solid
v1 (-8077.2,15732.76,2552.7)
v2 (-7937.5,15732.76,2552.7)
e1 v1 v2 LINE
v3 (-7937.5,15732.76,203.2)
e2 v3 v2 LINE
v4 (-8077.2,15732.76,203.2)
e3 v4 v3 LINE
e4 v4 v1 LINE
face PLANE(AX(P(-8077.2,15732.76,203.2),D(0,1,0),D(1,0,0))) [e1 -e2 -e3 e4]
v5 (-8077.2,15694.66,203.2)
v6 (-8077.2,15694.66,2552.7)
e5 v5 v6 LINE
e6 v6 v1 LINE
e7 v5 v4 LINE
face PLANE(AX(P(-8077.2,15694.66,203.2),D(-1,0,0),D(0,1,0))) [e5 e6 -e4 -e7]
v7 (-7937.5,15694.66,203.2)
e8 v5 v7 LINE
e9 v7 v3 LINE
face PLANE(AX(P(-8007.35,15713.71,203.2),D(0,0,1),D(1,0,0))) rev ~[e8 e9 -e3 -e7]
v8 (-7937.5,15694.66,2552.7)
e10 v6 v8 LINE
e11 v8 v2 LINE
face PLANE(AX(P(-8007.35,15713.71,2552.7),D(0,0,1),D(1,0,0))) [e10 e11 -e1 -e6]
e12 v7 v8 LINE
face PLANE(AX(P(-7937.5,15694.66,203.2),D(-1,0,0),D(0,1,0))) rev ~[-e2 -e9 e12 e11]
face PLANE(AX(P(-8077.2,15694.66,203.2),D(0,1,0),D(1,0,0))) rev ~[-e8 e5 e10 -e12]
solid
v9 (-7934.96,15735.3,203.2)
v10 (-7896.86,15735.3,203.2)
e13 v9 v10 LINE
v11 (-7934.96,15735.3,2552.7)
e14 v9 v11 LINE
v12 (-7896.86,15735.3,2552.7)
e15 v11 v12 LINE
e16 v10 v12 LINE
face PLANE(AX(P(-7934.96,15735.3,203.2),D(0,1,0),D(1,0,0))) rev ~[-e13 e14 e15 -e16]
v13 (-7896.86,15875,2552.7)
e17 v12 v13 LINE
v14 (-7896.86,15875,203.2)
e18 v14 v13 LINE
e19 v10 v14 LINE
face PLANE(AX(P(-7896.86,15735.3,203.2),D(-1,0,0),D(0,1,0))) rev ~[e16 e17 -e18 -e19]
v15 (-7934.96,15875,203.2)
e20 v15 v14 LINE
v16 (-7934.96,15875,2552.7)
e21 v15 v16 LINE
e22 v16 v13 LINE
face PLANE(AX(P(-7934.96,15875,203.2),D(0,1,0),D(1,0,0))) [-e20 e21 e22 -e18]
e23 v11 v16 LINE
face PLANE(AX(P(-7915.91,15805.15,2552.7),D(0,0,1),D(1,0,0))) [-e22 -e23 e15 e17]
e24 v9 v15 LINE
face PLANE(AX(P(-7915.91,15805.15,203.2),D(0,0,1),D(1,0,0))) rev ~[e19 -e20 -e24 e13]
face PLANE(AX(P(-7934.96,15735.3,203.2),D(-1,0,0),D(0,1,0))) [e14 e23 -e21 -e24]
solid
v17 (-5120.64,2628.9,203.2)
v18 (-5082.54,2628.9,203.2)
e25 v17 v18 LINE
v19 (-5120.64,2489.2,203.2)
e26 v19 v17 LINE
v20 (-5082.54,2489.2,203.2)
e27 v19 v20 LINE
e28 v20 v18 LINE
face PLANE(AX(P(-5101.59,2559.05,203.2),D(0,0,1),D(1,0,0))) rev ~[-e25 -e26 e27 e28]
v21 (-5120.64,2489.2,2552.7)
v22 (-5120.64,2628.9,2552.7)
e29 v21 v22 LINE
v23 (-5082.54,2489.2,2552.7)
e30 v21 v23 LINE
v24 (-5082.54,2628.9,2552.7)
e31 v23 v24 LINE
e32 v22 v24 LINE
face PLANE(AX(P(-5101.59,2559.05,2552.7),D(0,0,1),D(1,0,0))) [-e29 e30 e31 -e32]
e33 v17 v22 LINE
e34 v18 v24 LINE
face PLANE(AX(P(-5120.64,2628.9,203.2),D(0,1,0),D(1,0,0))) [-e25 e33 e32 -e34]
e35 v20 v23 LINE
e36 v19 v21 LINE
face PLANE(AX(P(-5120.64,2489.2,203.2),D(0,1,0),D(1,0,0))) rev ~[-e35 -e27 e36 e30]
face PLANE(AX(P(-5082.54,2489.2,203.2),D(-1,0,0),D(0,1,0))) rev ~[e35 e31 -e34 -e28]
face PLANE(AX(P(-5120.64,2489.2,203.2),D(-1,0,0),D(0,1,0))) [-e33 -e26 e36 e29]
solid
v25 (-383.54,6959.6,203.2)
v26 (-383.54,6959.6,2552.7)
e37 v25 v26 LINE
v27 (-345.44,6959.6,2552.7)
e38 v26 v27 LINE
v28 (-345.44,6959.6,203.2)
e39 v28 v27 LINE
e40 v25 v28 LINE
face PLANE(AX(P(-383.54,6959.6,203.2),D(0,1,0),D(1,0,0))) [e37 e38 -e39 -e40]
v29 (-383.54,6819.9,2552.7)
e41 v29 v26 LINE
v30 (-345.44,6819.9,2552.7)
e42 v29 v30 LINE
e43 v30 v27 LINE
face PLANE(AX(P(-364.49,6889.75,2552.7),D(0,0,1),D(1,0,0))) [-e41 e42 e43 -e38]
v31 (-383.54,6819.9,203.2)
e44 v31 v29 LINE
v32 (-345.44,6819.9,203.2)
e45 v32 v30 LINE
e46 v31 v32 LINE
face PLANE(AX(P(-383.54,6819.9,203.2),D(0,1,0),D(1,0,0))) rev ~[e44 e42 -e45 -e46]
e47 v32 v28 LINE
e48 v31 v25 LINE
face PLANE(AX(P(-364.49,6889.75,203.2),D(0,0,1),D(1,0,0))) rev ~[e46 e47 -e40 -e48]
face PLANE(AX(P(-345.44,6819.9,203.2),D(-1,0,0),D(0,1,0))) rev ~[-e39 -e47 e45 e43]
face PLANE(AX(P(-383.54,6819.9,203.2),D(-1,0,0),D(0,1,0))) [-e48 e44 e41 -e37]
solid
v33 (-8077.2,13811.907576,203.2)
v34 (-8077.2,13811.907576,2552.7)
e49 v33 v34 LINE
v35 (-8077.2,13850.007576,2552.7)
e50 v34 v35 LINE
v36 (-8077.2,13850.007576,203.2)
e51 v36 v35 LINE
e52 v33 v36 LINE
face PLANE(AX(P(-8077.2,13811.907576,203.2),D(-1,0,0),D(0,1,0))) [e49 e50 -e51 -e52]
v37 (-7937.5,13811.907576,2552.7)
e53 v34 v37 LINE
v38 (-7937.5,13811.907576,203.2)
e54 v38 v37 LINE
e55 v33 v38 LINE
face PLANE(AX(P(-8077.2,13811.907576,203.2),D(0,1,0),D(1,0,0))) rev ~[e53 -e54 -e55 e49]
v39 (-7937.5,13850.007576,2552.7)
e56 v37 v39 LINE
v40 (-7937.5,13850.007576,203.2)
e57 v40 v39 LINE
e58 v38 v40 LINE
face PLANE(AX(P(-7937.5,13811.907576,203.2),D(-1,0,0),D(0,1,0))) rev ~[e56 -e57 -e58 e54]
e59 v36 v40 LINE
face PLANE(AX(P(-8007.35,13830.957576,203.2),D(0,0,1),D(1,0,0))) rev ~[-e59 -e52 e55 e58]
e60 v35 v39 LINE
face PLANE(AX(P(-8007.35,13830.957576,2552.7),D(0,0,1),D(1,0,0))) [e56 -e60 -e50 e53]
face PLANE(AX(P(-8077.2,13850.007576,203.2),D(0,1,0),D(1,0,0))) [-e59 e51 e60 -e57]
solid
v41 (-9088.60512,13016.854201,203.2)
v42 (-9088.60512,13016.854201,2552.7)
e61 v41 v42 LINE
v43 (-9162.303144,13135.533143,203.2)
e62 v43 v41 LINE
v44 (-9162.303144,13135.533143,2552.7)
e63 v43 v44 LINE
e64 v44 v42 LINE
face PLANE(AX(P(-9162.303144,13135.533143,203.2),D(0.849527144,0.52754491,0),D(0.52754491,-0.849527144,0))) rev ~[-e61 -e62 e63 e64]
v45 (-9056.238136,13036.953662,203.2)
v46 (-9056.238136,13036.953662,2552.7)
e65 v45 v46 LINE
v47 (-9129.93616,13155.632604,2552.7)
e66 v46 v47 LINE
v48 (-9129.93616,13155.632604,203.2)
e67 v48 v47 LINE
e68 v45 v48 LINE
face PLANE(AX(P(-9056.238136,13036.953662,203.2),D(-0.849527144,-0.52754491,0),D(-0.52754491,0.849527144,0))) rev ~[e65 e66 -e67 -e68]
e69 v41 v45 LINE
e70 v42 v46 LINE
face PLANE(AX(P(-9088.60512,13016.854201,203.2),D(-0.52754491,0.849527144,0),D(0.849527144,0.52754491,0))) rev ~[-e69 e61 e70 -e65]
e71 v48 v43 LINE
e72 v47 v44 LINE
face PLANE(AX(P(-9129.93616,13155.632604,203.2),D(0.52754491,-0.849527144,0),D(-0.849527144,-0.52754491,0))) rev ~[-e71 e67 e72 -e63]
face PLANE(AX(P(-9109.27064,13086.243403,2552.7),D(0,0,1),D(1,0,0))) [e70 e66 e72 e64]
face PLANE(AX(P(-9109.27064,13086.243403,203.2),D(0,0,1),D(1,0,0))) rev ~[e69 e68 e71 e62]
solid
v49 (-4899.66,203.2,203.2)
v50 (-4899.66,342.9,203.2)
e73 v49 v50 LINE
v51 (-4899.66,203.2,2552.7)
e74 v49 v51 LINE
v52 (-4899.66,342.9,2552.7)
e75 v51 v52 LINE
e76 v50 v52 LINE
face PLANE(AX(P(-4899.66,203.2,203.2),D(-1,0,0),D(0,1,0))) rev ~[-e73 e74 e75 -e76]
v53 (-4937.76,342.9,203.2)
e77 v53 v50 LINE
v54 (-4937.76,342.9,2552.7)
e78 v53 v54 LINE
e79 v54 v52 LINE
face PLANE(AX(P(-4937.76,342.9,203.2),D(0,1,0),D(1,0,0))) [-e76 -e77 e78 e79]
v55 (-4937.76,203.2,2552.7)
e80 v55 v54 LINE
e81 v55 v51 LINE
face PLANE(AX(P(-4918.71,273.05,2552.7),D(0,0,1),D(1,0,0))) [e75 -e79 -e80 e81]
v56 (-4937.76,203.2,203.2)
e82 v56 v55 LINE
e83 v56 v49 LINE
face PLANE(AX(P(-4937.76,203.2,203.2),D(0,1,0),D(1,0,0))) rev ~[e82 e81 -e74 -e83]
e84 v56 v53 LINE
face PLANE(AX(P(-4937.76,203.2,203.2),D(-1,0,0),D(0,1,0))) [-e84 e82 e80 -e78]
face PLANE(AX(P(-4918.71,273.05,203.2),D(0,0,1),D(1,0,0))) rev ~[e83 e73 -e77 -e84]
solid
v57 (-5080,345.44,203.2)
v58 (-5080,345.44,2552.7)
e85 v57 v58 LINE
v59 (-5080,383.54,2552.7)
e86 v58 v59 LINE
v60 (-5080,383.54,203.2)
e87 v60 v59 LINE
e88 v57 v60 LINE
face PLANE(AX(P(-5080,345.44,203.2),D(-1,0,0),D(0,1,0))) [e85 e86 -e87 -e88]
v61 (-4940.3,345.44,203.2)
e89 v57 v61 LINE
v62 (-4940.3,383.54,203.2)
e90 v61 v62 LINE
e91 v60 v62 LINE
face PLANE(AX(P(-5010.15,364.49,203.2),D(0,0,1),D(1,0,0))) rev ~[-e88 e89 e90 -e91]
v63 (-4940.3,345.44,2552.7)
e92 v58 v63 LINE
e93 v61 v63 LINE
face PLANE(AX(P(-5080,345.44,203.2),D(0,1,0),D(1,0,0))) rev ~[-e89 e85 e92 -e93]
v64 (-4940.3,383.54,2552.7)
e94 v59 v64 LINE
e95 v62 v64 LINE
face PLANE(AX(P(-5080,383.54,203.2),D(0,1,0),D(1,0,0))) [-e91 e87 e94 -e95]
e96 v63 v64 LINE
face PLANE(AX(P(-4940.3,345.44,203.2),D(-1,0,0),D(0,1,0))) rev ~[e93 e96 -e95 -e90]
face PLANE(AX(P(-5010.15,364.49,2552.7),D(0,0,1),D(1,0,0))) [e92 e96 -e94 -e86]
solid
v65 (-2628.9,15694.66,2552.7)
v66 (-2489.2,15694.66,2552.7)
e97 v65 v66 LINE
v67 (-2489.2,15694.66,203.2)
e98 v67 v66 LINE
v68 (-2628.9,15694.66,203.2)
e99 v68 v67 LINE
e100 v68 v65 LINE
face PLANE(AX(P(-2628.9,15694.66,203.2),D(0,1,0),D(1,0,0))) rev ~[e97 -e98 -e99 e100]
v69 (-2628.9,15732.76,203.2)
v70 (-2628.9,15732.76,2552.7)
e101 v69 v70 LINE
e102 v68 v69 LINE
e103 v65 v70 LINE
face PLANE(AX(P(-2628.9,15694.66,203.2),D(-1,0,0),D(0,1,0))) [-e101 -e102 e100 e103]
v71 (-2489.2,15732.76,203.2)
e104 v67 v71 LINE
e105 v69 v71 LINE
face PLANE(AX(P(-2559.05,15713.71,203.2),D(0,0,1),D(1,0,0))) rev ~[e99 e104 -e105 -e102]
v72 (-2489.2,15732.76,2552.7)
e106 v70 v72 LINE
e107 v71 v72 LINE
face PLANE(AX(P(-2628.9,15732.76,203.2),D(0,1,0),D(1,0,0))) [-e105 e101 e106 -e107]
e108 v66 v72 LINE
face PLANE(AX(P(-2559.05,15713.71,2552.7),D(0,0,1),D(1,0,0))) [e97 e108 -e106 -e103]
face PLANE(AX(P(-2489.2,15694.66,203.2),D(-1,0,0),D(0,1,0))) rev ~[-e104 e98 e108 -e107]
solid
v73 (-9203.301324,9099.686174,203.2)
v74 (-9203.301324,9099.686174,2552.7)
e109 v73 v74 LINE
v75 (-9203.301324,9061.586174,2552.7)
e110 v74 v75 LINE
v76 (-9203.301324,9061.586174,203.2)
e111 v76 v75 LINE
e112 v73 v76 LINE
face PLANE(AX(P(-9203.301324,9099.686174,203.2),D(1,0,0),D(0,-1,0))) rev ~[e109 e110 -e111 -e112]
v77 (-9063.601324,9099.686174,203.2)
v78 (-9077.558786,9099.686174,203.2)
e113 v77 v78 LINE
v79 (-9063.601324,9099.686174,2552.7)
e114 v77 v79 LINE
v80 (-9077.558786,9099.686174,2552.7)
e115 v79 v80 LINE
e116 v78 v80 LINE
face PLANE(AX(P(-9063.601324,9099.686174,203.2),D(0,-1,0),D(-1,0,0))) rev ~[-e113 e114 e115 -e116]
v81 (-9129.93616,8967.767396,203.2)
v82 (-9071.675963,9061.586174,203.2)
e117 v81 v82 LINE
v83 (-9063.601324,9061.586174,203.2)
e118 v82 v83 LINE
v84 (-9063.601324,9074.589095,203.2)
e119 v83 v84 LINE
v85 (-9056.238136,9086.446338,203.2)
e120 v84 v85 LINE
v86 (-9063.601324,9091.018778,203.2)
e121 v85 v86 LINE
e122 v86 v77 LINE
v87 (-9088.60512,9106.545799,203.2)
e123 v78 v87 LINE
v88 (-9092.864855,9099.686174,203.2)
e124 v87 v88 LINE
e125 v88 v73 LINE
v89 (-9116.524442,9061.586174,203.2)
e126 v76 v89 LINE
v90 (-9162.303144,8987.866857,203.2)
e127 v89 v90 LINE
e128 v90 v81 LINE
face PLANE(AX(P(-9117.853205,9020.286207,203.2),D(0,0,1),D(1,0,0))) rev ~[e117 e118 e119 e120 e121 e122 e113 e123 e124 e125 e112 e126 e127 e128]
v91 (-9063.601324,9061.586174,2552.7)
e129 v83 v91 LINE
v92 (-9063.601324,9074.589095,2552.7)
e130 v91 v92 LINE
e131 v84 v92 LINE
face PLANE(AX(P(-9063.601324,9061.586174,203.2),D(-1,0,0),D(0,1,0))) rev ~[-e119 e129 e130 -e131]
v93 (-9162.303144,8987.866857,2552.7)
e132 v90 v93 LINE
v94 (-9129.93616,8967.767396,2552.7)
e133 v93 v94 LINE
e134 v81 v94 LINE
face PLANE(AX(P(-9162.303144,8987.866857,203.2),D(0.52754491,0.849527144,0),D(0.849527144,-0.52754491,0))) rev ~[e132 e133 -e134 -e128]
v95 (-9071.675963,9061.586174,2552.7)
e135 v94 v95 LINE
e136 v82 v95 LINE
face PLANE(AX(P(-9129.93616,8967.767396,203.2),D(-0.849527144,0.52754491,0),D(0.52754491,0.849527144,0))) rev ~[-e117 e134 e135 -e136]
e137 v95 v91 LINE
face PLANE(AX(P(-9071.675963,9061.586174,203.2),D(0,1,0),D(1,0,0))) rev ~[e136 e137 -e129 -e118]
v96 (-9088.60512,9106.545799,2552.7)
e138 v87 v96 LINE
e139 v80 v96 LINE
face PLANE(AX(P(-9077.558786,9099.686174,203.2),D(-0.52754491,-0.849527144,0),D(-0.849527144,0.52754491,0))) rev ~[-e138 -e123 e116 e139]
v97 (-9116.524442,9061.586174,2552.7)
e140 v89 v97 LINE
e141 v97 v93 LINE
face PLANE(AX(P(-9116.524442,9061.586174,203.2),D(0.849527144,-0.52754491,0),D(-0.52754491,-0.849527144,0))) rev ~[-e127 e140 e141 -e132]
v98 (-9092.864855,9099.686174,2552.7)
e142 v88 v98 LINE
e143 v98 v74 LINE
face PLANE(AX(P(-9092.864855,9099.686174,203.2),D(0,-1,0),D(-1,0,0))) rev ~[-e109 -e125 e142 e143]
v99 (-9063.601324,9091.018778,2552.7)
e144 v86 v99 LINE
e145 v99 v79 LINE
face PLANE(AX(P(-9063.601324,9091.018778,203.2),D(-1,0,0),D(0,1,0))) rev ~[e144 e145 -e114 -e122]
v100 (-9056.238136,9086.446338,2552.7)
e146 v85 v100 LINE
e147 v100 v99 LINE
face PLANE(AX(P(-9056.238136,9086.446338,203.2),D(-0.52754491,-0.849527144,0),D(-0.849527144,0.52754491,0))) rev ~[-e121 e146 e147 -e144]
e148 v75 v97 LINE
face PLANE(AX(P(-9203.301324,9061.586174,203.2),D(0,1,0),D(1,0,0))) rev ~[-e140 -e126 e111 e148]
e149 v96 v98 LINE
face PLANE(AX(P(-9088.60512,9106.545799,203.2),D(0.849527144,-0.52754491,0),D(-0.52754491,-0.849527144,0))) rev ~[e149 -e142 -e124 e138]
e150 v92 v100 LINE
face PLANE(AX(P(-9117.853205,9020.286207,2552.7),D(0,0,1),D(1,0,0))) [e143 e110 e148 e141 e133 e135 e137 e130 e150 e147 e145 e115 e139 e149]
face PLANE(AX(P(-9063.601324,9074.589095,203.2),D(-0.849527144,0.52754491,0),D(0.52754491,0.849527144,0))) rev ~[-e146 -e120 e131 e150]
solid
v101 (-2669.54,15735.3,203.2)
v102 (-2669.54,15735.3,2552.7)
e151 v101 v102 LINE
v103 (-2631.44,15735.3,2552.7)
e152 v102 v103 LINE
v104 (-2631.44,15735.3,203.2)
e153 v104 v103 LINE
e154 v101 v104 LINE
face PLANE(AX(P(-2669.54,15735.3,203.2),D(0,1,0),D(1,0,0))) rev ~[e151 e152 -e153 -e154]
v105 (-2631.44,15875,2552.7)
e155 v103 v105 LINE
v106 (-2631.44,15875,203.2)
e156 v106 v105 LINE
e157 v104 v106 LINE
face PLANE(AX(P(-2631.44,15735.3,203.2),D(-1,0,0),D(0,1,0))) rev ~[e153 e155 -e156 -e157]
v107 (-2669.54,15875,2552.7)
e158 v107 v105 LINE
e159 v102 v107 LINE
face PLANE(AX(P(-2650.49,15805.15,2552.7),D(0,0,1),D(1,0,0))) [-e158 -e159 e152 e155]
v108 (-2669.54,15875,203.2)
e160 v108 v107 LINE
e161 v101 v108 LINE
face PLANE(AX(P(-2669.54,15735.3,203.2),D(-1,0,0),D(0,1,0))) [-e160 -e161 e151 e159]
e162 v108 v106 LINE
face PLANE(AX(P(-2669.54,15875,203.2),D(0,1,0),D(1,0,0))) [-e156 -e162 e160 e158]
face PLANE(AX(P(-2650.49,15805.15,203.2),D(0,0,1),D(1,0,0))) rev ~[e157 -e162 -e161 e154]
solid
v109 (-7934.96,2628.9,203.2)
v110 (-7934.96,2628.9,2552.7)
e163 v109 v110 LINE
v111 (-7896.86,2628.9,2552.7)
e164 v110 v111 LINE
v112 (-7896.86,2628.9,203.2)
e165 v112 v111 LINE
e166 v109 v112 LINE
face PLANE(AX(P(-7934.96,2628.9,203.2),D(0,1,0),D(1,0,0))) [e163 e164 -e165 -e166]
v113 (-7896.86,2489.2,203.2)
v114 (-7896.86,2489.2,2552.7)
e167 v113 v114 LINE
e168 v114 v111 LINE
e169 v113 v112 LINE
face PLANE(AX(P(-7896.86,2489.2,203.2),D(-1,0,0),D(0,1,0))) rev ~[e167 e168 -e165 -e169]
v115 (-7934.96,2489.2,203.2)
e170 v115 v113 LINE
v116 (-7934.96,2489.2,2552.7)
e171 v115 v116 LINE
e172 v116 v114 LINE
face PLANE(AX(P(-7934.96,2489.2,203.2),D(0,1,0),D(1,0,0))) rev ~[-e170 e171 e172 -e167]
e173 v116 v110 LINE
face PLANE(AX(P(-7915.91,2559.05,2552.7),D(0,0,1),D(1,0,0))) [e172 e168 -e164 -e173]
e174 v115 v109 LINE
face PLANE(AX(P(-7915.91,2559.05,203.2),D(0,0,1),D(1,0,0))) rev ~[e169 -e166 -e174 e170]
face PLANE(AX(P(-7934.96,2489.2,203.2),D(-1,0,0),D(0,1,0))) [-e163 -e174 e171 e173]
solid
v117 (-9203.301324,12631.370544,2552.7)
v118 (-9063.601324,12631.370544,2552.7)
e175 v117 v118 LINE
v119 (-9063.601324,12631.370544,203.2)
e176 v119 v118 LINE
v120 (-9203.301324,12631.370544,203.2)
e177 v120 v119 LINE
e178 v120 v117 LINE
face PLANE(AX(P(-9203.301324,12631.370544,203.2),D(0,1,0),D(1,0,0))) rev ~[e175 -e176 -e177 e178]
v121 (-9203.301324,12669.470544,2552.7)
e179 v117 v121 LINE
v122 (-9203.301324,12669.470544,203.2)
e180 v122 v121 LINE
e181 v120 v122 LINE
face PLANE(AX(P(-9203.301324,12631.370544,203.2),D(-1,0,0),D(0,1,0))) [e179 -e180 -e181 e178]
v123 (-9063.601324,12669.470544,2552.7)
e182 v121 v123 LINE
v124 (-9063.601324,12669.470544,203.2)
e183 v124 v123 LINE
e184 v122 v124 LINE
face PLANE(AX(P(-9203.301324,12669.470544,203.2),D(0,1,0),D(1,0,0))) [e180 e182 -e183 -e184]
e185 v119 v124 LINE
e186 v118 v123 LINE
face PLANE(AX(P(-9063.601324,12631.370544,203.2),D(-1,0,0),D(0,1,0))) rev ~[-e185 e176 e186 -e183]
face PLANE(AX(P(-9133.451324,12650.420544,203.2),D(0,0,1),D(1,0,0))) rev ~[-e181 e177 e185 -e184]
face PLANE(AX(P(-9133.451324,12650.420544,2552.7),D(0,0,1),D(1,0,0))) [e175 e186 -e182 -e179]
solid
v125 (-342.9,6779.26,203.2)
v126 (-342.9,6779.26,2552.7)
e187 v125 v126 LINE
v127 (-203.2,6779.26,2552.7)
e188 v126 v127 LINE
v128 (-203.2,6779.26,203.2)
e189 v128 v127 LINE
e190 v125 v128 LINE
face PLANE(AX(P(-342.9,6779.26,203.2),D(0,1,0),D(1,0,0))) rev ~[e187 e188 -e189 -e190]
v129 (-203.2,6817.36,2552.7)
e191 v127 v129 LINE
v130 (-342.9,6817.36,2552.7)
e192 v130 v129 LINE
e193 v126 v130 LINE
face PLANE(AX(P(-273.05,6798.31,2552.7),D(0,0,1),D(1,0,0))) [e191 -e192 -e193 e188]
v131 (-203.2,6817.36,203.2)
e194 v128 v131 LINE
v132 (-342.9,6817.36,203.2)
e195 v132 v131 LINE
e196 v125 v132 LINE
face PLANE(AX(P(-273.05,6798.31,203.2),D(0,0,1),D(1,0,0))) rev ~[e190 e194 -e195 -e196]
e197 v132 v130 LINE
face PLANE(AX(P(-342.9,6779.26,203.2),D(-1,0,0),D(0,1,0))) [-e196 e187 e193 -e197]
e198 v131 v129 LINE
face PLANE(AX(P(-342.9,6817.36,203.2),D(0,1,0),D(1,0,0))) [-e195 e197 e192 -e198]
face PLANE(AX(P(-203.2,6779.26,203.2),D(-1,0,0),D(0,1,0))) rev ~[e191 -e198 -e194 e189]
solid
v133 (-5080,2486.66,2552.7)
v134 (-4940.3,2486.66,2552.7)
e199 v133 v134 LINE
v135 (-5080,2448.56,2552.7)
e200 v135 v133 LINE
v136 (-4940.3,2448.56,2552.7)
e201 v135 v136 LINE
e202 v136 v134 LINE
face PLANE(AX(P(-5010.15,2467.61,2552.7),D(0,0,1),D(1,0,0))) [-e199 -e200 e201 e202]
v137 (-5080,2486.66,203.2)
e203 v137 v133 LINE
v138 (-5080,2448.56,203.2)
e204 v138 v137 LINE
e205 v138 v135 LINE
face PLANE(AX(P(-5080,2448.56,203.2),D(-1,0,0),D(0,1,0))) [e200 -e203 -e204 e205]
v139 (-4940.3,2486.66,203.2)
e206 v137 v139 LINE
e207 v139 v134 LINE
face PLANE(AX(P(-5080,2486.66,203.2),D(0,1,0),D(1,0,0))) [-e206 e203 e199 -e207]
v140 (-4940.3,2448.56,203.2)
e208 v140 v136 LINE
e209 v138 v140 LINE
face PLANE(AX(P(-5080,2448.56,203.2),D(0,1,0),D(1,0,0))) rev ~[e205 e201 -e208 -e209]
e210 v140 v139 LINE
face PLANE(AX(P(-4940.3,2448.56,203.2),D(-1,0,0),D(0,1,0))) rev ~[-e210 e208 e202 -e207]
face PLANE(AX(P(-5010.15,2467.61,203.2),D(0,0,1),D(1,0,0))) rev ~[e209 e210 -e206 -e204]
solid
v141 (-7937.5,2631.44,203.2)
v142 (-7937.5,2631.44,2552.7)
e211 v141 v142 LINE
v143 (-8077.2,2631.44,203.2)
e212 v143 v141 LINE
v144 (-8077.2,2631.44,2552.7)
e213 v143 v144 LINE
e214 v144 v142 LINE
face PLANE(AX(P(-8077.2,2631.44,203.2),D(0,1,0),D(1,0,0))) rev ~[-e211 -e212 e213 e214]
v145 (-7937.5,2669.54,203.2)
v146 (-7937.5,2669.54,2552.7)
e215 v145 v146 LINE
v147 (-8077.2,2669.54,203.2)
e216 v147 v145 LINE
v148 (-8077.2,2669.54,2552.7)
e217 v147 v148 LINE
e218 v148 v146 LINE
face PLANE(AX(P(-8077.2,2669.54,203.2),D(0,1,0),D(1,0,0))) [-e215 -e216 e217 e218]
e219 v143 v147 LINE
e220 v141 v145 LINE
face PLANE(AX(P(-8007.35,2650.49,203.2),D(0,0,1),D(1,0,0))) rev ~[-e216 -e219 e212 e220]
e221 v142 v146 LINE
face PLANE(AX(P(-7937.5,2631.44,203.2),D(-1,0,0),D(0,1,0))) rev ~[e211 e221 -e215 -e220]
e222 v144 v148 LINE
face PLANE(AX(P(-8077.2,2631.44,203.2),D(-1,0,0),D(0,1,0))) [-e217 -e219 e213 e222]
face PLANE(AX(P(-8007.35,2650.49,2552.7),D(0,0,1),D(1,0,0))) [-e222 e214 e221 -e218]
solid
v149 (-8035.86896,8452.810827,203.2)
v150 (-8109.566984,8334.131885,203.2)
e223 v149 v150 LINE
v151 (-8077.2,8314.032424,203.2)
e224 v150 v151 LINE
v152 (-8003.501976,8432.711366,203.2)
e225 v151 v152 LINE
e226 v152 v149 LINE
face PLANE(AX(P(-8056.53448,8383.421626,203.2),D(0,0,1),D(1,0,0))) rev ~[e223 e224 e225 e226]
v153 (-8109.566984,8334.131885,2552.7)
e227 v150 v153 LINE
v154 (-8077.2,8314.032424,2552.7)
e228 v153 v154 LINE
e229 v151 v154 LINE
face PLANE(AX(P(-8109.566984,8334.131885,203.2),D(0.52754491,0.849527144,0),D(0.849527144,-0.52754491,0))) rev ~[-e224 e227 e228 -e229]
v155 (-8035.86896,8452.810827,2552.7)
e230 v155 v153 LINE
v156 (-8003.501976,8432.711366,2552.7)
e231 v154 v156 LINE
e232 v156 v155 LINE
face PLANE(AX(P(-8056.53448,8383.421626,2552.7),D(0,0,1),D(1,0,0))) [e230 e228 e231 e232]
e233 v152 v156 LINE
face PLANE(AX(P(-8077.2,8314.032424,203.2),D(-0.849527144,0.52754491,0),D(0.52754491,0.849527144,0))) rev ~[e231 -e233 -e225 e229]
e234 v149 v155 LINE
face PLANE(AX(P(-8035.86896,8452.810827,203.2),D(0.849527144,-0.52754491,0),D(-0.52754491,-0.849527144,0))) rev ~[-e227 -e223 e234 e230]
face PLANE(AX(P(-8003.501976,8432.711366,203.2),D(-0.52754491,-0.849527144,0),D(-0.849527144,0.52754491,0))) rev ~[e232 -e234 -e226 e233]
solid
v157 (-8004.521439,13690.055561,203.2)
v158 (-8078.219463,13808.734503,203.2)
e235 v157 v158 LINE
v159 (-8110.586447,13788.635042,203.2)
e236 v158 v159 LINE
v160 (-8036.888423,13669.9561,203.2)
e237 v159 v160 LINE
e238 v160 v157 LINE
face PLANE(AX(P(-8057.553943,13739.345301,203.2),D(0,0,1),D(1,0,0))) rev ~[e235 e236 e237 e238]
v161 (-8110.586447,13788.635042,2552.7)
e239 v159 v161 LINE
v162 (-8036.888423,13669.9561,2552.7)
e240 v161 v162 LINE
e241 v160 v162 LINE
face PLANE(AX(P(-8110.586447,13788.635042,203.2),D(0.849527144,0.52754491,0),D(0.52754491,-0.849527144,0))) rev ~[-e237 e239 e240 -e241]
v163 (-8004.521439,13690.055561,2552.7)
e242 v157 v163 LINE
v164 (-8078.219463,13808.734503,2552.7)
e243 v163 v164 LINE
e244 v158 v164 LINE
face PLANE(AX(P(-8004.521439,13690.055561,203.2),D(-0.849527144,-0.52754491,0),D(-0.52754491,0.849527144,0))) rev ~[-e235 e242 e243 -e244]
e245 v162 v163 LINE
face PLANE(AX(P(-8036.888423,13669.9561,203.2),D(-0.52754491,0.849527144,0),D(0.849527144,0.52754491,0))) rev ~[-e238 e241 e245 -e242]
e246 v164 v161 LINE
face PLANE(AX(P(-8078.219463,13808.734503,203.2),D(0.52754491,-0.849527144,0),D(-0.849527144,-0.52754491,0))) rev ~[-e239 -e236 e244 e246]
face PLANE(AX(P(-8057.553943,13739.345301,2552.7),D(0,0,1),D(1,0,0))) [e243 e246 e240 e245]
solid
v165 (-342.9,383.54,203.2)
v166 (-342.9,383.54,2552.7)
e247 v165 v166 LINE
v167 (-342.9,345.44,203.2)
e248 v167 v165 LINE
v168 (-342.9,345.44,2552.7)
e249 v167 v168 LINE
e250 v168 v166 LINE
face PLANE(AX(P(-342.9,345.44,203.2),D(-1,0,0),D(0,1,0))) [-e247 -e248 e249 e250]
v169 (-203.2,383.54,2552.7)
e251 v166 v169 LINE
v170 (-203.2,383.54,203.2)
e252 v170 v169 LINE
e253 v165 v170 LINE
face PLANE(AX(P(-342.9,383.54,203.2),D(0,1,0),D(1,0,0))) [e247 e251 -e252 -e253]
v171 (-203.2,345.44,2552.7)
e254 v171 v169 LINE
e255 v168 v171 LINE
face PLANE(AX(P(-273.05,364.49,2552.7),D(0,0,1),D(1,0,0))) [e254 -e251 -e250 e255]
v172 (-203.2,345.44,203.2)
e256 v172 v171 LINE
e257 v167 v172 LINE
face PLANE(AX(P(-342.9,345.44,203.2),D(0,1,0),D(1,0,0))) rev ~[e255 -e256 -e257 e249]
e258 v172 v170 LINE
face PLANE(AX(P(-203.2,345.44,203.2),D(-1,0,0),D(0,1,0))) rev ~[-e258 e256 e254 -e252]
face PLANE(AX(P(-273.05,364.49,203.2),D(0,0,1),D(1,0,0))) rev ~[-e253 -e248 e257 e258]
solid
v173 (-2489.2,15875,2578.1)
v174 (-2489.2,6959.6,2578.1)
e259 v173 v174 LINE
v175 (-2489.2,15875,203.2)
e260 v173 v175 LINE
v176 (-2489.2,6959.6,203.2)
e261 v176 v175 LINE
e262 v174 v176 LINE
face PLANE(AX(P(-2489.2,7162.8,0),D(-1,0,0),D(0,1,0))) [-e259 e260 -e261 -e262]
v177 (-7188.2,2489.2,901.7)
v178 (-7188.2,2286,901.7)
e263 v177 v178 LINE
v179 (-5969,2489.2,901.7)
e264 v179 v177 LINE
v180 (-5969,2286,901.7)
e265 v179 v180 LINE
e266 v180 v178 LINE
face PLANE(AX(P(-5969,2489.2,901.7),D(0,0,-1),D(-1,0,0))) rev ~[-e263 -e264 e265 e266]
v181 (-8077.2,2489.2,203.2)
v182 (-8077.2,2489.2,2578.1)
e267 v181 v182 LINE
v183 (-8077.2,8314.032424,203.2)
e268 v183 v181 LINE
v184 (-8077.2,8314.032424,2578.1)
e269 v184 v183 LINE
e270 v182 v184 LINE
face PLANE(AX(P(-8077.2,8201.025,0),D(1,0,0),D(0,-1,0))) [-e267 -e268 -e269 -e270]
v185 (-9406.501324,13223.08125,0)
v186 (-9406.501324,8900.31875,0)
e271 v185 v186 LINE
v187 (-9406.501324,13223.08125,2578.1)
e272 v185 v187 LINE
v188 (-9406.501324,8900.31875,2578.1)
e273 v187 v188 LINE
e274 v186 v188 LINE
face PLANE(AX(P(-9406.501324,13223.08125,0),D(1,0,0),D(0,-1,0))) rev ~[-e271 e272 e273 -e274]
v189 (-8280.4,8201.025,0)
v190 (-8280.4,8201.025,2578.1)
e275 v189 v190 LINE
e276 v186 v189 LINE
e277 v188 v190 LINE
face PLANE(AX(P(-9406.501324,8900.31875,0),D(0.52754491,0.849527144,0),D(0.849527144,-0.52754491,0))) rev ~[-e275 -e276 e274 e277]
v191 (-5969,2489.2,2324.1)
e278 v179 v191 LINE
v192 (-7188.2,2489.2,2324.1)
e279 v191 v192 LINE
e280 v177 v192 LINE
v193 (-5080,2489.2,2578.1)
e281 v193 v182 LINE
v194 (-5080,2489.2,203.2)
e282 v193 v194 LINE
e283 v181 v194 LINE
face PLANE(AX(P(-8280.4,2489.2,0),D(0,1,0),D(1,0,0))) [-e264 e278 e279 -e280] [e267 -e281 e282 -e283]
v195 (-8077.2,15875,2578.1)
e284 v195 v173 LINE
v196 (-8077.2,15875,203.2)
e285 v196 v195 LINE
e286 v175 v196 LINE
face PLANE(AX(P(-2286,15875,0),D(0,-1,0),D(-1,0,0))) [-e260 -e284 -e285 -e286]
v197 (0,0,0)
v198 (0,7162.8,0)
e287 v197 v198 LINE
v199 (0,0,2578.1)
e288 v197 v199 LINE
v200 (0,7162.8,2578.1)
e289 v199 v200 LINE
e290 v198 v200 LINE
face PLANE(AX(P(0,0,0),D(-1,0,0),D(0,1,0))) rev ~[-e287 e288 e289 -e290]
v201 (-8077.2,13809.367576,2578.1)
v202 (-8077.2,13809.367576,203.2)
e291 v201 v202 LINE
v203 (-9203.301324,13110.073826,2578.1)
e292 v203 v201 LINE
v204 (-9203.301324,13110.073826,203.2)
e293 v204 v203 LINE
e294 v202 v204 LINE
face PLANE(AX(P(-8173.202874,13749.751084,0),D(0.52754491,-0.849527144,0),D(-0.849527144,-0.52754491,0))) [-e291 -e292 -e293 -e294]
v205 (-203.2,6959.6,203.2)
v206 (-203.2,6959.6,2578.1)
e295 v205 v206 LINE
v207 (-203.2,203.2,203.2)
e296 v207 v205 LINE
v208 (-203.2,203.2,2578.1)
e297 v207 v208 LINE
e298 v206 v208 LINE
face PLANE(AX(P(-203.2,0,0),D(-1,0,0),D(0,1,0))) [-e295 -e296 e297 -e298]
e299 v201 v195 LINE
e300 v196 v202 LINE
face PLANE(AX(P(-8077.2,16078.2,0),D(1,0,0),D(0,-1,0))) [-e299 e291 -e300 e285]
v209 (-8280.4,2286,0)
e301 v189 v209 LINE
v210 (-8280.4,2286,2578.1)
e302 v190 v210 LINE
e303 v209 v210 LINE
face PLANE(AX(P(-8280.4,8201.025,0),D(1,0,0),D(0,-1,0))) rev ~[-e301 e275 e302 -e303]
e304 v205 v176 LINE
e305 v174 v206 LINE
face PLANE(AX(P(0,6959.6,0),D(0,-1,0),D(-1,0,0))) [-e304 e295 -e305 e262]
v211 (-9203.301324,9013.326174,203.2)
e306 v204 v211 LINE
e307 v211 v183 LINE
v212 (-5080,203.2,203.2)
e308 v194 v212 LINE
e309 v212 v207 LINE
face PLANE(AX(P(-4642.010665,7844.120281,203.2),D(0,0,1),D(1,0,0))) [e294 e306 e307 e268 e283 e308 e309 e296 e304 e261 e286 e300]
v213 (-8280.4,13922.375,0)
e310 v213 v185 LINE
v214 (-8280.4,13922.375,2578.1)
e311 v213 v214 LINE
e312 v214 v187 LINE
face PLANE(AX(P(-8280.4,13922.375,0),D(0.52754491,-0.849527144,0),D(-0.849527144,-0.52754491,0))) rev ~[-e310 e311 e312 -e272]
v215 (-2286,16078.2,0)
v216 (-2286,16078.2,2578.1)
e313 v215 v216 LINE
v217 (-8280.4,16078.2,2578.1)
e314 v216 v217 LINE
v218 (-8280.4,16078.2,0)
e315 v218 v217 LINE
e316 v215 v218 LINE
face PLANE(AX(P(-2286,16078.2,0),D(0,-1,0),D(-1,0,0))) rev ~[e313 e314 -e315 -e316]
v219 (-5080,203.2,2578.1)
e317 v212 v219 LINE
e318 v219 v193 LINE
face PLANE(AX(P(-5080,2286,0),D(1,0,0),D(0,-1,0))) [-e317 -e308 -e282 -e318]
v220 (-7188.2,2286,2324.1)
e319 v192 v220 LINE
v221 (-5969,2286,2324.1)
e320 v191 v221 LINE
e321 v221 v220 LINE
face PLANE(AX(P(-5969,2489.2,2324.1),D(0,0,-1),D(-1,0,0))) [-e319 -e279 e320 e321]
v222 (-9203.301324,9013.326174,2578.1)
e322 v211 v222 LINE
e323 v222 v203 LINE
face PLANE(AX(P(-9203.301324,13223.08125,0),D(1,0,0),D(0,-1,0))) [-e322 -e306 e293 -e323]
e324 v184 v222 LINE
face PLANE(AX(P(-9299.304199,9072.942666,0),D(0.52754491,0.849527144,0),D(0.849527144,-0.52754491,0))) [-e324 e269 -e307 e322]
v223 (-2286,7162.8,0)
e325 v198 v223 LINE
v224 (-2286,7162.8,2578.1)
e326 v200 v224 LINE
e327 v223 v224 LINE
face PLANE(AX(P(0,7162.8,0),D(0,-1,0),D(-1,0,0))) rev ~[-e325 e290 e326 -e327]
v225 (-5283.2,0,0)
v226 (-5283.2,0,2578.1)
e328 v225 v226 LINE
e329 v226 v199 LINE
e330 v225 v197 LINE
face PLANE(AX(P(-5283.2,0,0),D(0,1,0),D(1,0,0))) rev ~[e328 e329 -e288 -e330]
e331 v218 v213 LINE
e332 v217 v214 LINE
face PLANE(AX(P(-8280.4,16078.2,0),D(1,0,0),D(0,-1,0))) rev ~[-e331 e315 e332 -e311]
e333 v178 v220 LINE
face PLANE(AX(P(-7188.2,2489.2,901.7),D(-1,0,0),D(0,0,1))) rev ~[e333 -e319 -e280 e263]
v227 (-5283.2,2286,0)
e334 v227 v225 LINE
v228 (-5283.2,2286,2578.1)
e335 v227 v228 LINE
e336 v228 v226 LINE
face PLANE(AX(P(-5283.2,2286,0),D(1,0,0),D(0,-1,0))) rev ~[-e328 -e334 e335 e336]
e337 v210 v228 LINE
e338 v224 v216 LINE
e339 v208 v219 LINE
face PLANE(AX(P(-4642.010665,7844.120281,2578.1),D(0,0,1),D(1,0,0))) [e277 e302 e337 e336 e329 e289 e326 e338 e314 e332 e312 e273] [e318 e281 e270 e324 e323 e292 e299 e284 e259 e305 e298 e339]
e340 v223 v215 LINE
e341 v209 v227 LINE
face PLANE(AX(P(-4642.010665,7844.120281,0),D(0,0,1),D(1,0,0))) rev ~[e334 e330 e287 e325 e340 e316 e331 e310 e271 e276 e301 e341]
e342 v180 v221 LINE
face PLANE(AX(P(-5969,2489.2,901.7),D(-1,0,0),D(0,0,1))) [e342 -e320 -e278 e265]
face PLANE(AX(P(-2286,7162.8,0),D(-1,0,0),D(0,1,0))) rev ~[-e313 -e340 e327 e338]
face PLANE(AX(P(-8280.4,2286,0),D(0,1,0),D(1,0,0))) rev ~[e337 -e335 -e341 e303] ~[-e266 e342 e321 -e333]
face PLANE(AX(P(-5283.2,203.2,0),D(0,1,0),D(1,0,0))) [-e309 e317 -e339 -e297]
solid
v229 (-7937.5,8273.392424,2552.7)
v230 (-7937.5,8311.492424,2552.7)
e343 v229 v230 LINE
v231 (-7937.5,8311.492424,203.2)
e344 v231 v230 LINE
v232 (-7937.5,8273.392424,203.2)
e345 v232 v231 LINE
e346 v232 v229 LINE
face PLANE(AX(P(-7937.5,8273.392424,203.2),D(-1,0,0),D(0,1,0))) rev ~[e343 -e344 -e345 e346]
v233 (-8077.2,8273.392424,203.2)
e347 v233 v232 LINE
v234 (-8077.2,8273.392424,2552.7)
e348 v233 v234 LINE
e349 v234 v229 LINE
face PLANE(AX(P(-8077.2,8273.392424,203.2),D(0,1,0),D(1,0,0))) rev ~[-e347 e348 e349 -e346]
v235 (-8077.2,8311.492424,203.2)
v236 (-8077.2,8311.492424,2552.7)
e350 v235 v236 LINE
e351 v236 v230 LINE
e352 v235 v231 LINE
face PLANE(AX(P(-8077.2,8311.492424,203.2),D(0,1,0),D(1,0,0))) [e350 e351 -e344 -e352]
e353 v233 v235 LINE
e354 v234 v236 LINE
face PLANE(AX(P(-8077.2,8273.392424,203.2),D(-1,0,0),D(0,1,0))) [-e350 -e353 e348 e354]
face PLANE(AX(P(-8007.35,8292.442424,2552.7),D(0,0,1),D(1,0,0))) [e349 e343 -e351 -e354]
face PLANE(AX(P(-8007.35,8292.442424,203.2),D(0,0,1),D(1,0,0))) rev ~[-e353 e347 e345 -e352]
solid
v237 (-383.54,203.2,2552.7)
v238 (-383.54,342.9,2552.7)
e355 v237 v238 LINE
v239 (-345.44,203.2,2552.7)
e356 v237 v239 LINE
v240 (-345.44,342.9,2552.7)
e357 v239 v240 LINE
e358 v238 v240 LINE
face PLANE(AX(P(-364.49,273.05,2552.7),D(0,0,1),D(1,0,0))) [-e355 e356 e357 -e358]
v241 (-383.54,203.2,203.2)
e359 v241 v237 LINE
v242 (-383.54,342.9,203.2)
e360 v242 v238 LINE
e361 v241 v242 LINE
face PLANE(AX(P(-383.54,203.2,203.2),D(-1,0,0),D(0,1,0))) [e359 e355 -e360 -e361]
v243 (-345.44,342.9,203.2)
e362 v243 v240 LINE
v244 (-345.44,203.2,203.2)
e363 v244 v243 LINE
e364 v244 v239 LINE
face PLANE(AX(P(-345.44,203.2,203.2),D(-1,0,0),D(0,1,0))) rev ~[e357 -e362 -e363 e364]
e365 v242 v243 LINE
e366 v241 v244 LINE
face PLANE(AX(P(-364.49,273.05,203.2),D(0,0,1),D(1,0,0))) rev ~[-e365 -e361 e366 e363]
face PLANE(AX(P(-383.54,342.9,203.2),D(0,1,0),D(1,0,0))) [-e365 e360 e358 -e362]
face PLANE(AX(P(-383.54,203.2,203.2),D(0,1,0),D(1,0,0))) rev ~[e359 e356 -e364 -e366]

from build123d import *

# Parameters (mm, degrees)
F1_DEPTH = 2578.1
F2_T     = -203.2
F3_W     = 1219.2
F3_H     = 1422.4
F5_DEPTH = 203.2
F4_W     = 139.7
F4_H     = 38.1
F6_DEPTH = 2349.5
F4_W_2   = 38.1
F4_H_2   = 139.7


# Not quite as in the source:
# - a feature of the source that left no trace in its solid (it failed there, or was rolled back) is left out


with BuildPart() as f1:
    # F0 (on Top) → F1 (new body)
    with BuildSketch(Plane.XY):
        Polygon((-2286, 16078.2), (-8280.4, 16078.2), (-8280.4, 13922.375), (-9406.501324312, 13223.08125), (-9406.501324312, 8900.31875), (-8280.4, 8201.025), (-8280.4, 2286), (-5283.2, 2286), (-5283.2, 0), (0, 0), (0, 7162.8), (-2286, 7162.8), align=None)
    extrude(amount=F1_DEPTH)

    # F2
    f2_openings = [f1.faces().sort_by_distance(p)[0] for p in [
        (-4762.628229, 7961.579676, 2578.1),
    ]]
    offset(amount=F2_T, openings=f2_openings, kind=Kind.INTERSECTION)

    # F3 (on face) → F5 (cut, through all)
    with BuildSketch(Plane(origin=(0, 2489.2, 0), x_dir=(-1, 0, 0), z_dir=(0, 1, 0))):
        with Locations((6578.6, 1612.9)):
            Rectangle(F3_W, F3_H)
    extrude(amount=-F5_DEPTH, mode=Mode.SUBTRACT)


with BuildPart() as f6:
    # F4 (on face) → F6 (new body)
    with BuildSketch(Plane.XY.offset(203.2)):
        with Locations((-8007.35, 13830.9575758433)):
            Rectangle(F4_W, F4_H)
    extrude(amount=F6_DEPTH)


with BuildPart() as f6b:
    # F4 (on face) → F6, piece 2 (new body)
    with BuildSketch(Plane.XY.offset(203.2)):
        with Locations((-7915.91, 15805.15)):
            Rectangle(F4_W_2, F4_H_2)
    extrude(amount=F6_DEPTH)


with BuildPart() as f6c:
    # F4 (on face) → F6, piece 3 (new body)
    with BuildSketch(Plane.XY.offset(203.2)):
        with Locations((-8007.35, 15713.71)):
            Rectangle(F4_W, F4_H)
    extrude(amount=F6_DEPTH)


with BuildPart() as f6d:
    # F4 (on face) → F6, piece 4 (new body)
    with BuildSketch(Plane.XY.offset(203.2)):
        with Locations((-2650.49, 15805.15)):
            Rectangle(F4_W_2, F4_H_2)
    extrude(amount=F6_DEPTH)


with BuildPart() as f6e:
    # F4 (on face) → F6, piece 5 (new body)
    with BuildSketch(Plane.XY.offset(203.2)):
        with Locations((-2559.05, 15713.71)):
            Rectangle(F4_W, F4_H)
    extrude(amount=F6_DEPTH)


with BuildPart() as f6f:
    # F4 (on face) → F6, piece 6 (new body)
    with BuildSketch(Plane.XY.offset(203.2)):
        Polygon((-8004.5214391422, 13690.0555610339), (-8078.2194630943, 13808.7345029973), (-8110.5864472661, 13788.6350419195), (-8036.888423314, 13669.9560999561), align=None)
    extrude(amount=F6_DEPTH)


with BuildPart() as f6g:
    # F4 (on face) → F6, piece 7 (new body)
    with BuildSketch(Plane.XY.offset(203.2)):
        with Locations((-9133.451324312, 12650.4205444336)):
            Rectangle(F4_W, F4_H)
    extrude(amount=F6_DEPTH)


with BuildPart() as f6h:
    # F4 (on face) → F6, piece 8 (new body)
    with BuildSketch(Plane.XY.offset(203.2)):
        Polygon((-9129.9361601891, 13155.6326042864), (-9162.303144361, 13135.5331432085), (-9088.6051204089, 13016.8542012451), (-9056.238136237, 13036.9536623229), align=None)
    extrude(amount=F6_DEPTH)


with BuildPart() as f6i:
    # F4 (on face) → F6, piece 9 (new body)
    with BuildSketch(Plane.XY.offset(203.2)):
        Polygon((-9116.524441526, 9061.5861741567), (-9162.303144361, 8987.8668567915), (-9129.9361601891, 8967.7673957136), (-9071.6759628326, 9061.5861741567), align=None)
        Polygon((-9203.301324312, 9061.5861741567), (-9116.524441526, 9061.5861741567), (-9092.864854862, 9099.6861741567), (-9203.301324312, 9099.6861741567), align=None)
        Polygon((-9092.864854862, 9099.6861741567), (-9116.524441526, 9061.5861741567), (-9071.6759628326, 9061.5861741567), (-9063.601324312, 9074.5890947912), (-9063.601324312, 9091.0187782645), (-9077.5587863837, 9099.6861741567), align=None)
        Polygon((-9088.6051204089, 9106.5457987549), (-9092.864854862, 9099.6861741567), (-9077.5587863837, 9099.6861741567), align=None)
        Polygon((-9063.601324312, 9074.5890947912), (-9071.6759628326, 9061.5861741567), (-9063.601324312, 9061.5861741567), align=None)
        Polygon((-9063.601324312, 9099.6861741567), (-9077.5587863837, 9099.6861741567), (-9063.601324312, 9091.0187782645), align=None)
        Polygon((-9063.601324312, 9091.0187782645), (-9063.601324312, 9074.5890947912), (-9056.238136237, 9086.446337677), align=None)
    extrude(amount=F6_DEPTH)


with BuildPart() as f6j:
    # F4 (on face) → F6, piece 10 (new body)
    with BuildSketch(Plane.XY.offset(203.2)):
        Polygon((-8035.8689602197, 8452.810827198), (-8109.5669841718, 8334.1318852346), (-8077.2, 8314.0324241568), (-8003.5019760479, 8432.7113661202), align=None)
    extrude(amount=F6_DEPTH)


with BuildPart() as f6k:
    # F4 (on face) → F6, piece 11 (new body)
    with BuildSketch(Plane.XY.offset(203.2)):
        with Locations((-8007.35, 8292.4424241568)):
            Rectangle(F4_W, F4_H)
    extrude(amount=F6_DEPTH)


with BuildPart() as f6l:
    # F4 (on face) → F6, piece 12 (new body)
    with BuildSketch(Plane.XY.offset(203.2)):
        with Locations((-8007.35, 2650.49)):
            Rectangle(F4_W, F4_H)
    extrude(amount=F6_DEPTH)


with BuildPart() as f6m:
    # F4 (on face) → F6, piece 13 (new body)
    with BuildSketch(Plane.XY.offset(203.2)):
        with Locations((-7915.91, 2559.05)):
            Rectangle(F4_W_2, F4_H_2)
    extrude(amount=F6_DEPTH)


with BuildPart() as f6n:
    # F4 (on face) → F6, piece 14 (new body)
    with BuildSketch(Plane.XY.offset(203.2)):
        with Locations((-5101.59, 2559.05)):
            Rectangle(F4_W_2, F4_H_2)
    extrude(amount=F6_DEPTH)


with BuildPart() as f6o:
    # F4 (on face) → F6, piece 15 (new body)
    with BuildSketch(Plane.XY.offset(203.2)):
        with Locations((-5010.15, 2467.61)):
            Rectangle(F4_W, F4_H)
    extrude(amount=F6_DEPTH)


with BuildPart() as f6p:
    # F4 (on face) → F6, piece 16 (new body)
    with BuildSketch(Plane.XY.offset(203.2)):
        with Locations((-5010.15, 364.49)):
            Rectangle(F4_W, F4_H)
    extrude(amount=F6_DEPTH)


with BuildPart() as f6q:
    # F4 (on face) → F6, piece 17 (new body)
    with BuildSketch(Plane.XY.offset(203.2)):
        with Locations((-4918.71, 273.05)):
            Rectangle(F4_W_2, F4_H_2)
    extrude(amount=F6_DEPTH)


with BuildPart() as f6r:
    # F4 (on face) → F6, piece 18 (new body)
    with BuildSketch(Plane.XY.offset(203.2)):
        with Locations((-364.49, 273.05)):
            Rectangle(F4_W_2, F4_H_2)
    extrude(amount=F6_DEPTH)


with BuildPart() as f6s:
    # F4 (on face) → F6, piece 19 (new body)
    with BuildSketch(Plane.XY.offset(203.2)):
        with Locations((-273.05, 364.49)):
            Rectangle(F4_W, F4_H)
    extrude(amount=F6_DEPTH)


with BuildPart() as f6t:
    # F4 (on face) → F6, piece 20 (new body)
    with BuildSketch(Plane.XY.offset(203.2)):
        with Locations((-273.05, 6798.31)):
            Rectangle(F4_W, F4_H)
    extrude(amount=F6_DEPTH)


with BuildPart() as f6u:
    # F4 (on face) → F6, piece 21 (new body)
    with BuildSketch(Plane.XY.offset(203.2)):
        with Locations((-364.49, 6889.75)):
            Rectangle(F4_W_2, F4_H_2)
    extrude(amount=F6_DEPTH)


solid = Compound([f1.part, f6.part, f6b.part, f6c.part, f6d.part, f6e.part, f6f.part, f6g.part, f6h.part, f6i.part, f6j.part, f6k.part, f6l.part, f6m.part, f6n.part, f6o.part, f6p.part, f6q.part, f6r.part, f6s.part, f6t.part, f6u.part])
